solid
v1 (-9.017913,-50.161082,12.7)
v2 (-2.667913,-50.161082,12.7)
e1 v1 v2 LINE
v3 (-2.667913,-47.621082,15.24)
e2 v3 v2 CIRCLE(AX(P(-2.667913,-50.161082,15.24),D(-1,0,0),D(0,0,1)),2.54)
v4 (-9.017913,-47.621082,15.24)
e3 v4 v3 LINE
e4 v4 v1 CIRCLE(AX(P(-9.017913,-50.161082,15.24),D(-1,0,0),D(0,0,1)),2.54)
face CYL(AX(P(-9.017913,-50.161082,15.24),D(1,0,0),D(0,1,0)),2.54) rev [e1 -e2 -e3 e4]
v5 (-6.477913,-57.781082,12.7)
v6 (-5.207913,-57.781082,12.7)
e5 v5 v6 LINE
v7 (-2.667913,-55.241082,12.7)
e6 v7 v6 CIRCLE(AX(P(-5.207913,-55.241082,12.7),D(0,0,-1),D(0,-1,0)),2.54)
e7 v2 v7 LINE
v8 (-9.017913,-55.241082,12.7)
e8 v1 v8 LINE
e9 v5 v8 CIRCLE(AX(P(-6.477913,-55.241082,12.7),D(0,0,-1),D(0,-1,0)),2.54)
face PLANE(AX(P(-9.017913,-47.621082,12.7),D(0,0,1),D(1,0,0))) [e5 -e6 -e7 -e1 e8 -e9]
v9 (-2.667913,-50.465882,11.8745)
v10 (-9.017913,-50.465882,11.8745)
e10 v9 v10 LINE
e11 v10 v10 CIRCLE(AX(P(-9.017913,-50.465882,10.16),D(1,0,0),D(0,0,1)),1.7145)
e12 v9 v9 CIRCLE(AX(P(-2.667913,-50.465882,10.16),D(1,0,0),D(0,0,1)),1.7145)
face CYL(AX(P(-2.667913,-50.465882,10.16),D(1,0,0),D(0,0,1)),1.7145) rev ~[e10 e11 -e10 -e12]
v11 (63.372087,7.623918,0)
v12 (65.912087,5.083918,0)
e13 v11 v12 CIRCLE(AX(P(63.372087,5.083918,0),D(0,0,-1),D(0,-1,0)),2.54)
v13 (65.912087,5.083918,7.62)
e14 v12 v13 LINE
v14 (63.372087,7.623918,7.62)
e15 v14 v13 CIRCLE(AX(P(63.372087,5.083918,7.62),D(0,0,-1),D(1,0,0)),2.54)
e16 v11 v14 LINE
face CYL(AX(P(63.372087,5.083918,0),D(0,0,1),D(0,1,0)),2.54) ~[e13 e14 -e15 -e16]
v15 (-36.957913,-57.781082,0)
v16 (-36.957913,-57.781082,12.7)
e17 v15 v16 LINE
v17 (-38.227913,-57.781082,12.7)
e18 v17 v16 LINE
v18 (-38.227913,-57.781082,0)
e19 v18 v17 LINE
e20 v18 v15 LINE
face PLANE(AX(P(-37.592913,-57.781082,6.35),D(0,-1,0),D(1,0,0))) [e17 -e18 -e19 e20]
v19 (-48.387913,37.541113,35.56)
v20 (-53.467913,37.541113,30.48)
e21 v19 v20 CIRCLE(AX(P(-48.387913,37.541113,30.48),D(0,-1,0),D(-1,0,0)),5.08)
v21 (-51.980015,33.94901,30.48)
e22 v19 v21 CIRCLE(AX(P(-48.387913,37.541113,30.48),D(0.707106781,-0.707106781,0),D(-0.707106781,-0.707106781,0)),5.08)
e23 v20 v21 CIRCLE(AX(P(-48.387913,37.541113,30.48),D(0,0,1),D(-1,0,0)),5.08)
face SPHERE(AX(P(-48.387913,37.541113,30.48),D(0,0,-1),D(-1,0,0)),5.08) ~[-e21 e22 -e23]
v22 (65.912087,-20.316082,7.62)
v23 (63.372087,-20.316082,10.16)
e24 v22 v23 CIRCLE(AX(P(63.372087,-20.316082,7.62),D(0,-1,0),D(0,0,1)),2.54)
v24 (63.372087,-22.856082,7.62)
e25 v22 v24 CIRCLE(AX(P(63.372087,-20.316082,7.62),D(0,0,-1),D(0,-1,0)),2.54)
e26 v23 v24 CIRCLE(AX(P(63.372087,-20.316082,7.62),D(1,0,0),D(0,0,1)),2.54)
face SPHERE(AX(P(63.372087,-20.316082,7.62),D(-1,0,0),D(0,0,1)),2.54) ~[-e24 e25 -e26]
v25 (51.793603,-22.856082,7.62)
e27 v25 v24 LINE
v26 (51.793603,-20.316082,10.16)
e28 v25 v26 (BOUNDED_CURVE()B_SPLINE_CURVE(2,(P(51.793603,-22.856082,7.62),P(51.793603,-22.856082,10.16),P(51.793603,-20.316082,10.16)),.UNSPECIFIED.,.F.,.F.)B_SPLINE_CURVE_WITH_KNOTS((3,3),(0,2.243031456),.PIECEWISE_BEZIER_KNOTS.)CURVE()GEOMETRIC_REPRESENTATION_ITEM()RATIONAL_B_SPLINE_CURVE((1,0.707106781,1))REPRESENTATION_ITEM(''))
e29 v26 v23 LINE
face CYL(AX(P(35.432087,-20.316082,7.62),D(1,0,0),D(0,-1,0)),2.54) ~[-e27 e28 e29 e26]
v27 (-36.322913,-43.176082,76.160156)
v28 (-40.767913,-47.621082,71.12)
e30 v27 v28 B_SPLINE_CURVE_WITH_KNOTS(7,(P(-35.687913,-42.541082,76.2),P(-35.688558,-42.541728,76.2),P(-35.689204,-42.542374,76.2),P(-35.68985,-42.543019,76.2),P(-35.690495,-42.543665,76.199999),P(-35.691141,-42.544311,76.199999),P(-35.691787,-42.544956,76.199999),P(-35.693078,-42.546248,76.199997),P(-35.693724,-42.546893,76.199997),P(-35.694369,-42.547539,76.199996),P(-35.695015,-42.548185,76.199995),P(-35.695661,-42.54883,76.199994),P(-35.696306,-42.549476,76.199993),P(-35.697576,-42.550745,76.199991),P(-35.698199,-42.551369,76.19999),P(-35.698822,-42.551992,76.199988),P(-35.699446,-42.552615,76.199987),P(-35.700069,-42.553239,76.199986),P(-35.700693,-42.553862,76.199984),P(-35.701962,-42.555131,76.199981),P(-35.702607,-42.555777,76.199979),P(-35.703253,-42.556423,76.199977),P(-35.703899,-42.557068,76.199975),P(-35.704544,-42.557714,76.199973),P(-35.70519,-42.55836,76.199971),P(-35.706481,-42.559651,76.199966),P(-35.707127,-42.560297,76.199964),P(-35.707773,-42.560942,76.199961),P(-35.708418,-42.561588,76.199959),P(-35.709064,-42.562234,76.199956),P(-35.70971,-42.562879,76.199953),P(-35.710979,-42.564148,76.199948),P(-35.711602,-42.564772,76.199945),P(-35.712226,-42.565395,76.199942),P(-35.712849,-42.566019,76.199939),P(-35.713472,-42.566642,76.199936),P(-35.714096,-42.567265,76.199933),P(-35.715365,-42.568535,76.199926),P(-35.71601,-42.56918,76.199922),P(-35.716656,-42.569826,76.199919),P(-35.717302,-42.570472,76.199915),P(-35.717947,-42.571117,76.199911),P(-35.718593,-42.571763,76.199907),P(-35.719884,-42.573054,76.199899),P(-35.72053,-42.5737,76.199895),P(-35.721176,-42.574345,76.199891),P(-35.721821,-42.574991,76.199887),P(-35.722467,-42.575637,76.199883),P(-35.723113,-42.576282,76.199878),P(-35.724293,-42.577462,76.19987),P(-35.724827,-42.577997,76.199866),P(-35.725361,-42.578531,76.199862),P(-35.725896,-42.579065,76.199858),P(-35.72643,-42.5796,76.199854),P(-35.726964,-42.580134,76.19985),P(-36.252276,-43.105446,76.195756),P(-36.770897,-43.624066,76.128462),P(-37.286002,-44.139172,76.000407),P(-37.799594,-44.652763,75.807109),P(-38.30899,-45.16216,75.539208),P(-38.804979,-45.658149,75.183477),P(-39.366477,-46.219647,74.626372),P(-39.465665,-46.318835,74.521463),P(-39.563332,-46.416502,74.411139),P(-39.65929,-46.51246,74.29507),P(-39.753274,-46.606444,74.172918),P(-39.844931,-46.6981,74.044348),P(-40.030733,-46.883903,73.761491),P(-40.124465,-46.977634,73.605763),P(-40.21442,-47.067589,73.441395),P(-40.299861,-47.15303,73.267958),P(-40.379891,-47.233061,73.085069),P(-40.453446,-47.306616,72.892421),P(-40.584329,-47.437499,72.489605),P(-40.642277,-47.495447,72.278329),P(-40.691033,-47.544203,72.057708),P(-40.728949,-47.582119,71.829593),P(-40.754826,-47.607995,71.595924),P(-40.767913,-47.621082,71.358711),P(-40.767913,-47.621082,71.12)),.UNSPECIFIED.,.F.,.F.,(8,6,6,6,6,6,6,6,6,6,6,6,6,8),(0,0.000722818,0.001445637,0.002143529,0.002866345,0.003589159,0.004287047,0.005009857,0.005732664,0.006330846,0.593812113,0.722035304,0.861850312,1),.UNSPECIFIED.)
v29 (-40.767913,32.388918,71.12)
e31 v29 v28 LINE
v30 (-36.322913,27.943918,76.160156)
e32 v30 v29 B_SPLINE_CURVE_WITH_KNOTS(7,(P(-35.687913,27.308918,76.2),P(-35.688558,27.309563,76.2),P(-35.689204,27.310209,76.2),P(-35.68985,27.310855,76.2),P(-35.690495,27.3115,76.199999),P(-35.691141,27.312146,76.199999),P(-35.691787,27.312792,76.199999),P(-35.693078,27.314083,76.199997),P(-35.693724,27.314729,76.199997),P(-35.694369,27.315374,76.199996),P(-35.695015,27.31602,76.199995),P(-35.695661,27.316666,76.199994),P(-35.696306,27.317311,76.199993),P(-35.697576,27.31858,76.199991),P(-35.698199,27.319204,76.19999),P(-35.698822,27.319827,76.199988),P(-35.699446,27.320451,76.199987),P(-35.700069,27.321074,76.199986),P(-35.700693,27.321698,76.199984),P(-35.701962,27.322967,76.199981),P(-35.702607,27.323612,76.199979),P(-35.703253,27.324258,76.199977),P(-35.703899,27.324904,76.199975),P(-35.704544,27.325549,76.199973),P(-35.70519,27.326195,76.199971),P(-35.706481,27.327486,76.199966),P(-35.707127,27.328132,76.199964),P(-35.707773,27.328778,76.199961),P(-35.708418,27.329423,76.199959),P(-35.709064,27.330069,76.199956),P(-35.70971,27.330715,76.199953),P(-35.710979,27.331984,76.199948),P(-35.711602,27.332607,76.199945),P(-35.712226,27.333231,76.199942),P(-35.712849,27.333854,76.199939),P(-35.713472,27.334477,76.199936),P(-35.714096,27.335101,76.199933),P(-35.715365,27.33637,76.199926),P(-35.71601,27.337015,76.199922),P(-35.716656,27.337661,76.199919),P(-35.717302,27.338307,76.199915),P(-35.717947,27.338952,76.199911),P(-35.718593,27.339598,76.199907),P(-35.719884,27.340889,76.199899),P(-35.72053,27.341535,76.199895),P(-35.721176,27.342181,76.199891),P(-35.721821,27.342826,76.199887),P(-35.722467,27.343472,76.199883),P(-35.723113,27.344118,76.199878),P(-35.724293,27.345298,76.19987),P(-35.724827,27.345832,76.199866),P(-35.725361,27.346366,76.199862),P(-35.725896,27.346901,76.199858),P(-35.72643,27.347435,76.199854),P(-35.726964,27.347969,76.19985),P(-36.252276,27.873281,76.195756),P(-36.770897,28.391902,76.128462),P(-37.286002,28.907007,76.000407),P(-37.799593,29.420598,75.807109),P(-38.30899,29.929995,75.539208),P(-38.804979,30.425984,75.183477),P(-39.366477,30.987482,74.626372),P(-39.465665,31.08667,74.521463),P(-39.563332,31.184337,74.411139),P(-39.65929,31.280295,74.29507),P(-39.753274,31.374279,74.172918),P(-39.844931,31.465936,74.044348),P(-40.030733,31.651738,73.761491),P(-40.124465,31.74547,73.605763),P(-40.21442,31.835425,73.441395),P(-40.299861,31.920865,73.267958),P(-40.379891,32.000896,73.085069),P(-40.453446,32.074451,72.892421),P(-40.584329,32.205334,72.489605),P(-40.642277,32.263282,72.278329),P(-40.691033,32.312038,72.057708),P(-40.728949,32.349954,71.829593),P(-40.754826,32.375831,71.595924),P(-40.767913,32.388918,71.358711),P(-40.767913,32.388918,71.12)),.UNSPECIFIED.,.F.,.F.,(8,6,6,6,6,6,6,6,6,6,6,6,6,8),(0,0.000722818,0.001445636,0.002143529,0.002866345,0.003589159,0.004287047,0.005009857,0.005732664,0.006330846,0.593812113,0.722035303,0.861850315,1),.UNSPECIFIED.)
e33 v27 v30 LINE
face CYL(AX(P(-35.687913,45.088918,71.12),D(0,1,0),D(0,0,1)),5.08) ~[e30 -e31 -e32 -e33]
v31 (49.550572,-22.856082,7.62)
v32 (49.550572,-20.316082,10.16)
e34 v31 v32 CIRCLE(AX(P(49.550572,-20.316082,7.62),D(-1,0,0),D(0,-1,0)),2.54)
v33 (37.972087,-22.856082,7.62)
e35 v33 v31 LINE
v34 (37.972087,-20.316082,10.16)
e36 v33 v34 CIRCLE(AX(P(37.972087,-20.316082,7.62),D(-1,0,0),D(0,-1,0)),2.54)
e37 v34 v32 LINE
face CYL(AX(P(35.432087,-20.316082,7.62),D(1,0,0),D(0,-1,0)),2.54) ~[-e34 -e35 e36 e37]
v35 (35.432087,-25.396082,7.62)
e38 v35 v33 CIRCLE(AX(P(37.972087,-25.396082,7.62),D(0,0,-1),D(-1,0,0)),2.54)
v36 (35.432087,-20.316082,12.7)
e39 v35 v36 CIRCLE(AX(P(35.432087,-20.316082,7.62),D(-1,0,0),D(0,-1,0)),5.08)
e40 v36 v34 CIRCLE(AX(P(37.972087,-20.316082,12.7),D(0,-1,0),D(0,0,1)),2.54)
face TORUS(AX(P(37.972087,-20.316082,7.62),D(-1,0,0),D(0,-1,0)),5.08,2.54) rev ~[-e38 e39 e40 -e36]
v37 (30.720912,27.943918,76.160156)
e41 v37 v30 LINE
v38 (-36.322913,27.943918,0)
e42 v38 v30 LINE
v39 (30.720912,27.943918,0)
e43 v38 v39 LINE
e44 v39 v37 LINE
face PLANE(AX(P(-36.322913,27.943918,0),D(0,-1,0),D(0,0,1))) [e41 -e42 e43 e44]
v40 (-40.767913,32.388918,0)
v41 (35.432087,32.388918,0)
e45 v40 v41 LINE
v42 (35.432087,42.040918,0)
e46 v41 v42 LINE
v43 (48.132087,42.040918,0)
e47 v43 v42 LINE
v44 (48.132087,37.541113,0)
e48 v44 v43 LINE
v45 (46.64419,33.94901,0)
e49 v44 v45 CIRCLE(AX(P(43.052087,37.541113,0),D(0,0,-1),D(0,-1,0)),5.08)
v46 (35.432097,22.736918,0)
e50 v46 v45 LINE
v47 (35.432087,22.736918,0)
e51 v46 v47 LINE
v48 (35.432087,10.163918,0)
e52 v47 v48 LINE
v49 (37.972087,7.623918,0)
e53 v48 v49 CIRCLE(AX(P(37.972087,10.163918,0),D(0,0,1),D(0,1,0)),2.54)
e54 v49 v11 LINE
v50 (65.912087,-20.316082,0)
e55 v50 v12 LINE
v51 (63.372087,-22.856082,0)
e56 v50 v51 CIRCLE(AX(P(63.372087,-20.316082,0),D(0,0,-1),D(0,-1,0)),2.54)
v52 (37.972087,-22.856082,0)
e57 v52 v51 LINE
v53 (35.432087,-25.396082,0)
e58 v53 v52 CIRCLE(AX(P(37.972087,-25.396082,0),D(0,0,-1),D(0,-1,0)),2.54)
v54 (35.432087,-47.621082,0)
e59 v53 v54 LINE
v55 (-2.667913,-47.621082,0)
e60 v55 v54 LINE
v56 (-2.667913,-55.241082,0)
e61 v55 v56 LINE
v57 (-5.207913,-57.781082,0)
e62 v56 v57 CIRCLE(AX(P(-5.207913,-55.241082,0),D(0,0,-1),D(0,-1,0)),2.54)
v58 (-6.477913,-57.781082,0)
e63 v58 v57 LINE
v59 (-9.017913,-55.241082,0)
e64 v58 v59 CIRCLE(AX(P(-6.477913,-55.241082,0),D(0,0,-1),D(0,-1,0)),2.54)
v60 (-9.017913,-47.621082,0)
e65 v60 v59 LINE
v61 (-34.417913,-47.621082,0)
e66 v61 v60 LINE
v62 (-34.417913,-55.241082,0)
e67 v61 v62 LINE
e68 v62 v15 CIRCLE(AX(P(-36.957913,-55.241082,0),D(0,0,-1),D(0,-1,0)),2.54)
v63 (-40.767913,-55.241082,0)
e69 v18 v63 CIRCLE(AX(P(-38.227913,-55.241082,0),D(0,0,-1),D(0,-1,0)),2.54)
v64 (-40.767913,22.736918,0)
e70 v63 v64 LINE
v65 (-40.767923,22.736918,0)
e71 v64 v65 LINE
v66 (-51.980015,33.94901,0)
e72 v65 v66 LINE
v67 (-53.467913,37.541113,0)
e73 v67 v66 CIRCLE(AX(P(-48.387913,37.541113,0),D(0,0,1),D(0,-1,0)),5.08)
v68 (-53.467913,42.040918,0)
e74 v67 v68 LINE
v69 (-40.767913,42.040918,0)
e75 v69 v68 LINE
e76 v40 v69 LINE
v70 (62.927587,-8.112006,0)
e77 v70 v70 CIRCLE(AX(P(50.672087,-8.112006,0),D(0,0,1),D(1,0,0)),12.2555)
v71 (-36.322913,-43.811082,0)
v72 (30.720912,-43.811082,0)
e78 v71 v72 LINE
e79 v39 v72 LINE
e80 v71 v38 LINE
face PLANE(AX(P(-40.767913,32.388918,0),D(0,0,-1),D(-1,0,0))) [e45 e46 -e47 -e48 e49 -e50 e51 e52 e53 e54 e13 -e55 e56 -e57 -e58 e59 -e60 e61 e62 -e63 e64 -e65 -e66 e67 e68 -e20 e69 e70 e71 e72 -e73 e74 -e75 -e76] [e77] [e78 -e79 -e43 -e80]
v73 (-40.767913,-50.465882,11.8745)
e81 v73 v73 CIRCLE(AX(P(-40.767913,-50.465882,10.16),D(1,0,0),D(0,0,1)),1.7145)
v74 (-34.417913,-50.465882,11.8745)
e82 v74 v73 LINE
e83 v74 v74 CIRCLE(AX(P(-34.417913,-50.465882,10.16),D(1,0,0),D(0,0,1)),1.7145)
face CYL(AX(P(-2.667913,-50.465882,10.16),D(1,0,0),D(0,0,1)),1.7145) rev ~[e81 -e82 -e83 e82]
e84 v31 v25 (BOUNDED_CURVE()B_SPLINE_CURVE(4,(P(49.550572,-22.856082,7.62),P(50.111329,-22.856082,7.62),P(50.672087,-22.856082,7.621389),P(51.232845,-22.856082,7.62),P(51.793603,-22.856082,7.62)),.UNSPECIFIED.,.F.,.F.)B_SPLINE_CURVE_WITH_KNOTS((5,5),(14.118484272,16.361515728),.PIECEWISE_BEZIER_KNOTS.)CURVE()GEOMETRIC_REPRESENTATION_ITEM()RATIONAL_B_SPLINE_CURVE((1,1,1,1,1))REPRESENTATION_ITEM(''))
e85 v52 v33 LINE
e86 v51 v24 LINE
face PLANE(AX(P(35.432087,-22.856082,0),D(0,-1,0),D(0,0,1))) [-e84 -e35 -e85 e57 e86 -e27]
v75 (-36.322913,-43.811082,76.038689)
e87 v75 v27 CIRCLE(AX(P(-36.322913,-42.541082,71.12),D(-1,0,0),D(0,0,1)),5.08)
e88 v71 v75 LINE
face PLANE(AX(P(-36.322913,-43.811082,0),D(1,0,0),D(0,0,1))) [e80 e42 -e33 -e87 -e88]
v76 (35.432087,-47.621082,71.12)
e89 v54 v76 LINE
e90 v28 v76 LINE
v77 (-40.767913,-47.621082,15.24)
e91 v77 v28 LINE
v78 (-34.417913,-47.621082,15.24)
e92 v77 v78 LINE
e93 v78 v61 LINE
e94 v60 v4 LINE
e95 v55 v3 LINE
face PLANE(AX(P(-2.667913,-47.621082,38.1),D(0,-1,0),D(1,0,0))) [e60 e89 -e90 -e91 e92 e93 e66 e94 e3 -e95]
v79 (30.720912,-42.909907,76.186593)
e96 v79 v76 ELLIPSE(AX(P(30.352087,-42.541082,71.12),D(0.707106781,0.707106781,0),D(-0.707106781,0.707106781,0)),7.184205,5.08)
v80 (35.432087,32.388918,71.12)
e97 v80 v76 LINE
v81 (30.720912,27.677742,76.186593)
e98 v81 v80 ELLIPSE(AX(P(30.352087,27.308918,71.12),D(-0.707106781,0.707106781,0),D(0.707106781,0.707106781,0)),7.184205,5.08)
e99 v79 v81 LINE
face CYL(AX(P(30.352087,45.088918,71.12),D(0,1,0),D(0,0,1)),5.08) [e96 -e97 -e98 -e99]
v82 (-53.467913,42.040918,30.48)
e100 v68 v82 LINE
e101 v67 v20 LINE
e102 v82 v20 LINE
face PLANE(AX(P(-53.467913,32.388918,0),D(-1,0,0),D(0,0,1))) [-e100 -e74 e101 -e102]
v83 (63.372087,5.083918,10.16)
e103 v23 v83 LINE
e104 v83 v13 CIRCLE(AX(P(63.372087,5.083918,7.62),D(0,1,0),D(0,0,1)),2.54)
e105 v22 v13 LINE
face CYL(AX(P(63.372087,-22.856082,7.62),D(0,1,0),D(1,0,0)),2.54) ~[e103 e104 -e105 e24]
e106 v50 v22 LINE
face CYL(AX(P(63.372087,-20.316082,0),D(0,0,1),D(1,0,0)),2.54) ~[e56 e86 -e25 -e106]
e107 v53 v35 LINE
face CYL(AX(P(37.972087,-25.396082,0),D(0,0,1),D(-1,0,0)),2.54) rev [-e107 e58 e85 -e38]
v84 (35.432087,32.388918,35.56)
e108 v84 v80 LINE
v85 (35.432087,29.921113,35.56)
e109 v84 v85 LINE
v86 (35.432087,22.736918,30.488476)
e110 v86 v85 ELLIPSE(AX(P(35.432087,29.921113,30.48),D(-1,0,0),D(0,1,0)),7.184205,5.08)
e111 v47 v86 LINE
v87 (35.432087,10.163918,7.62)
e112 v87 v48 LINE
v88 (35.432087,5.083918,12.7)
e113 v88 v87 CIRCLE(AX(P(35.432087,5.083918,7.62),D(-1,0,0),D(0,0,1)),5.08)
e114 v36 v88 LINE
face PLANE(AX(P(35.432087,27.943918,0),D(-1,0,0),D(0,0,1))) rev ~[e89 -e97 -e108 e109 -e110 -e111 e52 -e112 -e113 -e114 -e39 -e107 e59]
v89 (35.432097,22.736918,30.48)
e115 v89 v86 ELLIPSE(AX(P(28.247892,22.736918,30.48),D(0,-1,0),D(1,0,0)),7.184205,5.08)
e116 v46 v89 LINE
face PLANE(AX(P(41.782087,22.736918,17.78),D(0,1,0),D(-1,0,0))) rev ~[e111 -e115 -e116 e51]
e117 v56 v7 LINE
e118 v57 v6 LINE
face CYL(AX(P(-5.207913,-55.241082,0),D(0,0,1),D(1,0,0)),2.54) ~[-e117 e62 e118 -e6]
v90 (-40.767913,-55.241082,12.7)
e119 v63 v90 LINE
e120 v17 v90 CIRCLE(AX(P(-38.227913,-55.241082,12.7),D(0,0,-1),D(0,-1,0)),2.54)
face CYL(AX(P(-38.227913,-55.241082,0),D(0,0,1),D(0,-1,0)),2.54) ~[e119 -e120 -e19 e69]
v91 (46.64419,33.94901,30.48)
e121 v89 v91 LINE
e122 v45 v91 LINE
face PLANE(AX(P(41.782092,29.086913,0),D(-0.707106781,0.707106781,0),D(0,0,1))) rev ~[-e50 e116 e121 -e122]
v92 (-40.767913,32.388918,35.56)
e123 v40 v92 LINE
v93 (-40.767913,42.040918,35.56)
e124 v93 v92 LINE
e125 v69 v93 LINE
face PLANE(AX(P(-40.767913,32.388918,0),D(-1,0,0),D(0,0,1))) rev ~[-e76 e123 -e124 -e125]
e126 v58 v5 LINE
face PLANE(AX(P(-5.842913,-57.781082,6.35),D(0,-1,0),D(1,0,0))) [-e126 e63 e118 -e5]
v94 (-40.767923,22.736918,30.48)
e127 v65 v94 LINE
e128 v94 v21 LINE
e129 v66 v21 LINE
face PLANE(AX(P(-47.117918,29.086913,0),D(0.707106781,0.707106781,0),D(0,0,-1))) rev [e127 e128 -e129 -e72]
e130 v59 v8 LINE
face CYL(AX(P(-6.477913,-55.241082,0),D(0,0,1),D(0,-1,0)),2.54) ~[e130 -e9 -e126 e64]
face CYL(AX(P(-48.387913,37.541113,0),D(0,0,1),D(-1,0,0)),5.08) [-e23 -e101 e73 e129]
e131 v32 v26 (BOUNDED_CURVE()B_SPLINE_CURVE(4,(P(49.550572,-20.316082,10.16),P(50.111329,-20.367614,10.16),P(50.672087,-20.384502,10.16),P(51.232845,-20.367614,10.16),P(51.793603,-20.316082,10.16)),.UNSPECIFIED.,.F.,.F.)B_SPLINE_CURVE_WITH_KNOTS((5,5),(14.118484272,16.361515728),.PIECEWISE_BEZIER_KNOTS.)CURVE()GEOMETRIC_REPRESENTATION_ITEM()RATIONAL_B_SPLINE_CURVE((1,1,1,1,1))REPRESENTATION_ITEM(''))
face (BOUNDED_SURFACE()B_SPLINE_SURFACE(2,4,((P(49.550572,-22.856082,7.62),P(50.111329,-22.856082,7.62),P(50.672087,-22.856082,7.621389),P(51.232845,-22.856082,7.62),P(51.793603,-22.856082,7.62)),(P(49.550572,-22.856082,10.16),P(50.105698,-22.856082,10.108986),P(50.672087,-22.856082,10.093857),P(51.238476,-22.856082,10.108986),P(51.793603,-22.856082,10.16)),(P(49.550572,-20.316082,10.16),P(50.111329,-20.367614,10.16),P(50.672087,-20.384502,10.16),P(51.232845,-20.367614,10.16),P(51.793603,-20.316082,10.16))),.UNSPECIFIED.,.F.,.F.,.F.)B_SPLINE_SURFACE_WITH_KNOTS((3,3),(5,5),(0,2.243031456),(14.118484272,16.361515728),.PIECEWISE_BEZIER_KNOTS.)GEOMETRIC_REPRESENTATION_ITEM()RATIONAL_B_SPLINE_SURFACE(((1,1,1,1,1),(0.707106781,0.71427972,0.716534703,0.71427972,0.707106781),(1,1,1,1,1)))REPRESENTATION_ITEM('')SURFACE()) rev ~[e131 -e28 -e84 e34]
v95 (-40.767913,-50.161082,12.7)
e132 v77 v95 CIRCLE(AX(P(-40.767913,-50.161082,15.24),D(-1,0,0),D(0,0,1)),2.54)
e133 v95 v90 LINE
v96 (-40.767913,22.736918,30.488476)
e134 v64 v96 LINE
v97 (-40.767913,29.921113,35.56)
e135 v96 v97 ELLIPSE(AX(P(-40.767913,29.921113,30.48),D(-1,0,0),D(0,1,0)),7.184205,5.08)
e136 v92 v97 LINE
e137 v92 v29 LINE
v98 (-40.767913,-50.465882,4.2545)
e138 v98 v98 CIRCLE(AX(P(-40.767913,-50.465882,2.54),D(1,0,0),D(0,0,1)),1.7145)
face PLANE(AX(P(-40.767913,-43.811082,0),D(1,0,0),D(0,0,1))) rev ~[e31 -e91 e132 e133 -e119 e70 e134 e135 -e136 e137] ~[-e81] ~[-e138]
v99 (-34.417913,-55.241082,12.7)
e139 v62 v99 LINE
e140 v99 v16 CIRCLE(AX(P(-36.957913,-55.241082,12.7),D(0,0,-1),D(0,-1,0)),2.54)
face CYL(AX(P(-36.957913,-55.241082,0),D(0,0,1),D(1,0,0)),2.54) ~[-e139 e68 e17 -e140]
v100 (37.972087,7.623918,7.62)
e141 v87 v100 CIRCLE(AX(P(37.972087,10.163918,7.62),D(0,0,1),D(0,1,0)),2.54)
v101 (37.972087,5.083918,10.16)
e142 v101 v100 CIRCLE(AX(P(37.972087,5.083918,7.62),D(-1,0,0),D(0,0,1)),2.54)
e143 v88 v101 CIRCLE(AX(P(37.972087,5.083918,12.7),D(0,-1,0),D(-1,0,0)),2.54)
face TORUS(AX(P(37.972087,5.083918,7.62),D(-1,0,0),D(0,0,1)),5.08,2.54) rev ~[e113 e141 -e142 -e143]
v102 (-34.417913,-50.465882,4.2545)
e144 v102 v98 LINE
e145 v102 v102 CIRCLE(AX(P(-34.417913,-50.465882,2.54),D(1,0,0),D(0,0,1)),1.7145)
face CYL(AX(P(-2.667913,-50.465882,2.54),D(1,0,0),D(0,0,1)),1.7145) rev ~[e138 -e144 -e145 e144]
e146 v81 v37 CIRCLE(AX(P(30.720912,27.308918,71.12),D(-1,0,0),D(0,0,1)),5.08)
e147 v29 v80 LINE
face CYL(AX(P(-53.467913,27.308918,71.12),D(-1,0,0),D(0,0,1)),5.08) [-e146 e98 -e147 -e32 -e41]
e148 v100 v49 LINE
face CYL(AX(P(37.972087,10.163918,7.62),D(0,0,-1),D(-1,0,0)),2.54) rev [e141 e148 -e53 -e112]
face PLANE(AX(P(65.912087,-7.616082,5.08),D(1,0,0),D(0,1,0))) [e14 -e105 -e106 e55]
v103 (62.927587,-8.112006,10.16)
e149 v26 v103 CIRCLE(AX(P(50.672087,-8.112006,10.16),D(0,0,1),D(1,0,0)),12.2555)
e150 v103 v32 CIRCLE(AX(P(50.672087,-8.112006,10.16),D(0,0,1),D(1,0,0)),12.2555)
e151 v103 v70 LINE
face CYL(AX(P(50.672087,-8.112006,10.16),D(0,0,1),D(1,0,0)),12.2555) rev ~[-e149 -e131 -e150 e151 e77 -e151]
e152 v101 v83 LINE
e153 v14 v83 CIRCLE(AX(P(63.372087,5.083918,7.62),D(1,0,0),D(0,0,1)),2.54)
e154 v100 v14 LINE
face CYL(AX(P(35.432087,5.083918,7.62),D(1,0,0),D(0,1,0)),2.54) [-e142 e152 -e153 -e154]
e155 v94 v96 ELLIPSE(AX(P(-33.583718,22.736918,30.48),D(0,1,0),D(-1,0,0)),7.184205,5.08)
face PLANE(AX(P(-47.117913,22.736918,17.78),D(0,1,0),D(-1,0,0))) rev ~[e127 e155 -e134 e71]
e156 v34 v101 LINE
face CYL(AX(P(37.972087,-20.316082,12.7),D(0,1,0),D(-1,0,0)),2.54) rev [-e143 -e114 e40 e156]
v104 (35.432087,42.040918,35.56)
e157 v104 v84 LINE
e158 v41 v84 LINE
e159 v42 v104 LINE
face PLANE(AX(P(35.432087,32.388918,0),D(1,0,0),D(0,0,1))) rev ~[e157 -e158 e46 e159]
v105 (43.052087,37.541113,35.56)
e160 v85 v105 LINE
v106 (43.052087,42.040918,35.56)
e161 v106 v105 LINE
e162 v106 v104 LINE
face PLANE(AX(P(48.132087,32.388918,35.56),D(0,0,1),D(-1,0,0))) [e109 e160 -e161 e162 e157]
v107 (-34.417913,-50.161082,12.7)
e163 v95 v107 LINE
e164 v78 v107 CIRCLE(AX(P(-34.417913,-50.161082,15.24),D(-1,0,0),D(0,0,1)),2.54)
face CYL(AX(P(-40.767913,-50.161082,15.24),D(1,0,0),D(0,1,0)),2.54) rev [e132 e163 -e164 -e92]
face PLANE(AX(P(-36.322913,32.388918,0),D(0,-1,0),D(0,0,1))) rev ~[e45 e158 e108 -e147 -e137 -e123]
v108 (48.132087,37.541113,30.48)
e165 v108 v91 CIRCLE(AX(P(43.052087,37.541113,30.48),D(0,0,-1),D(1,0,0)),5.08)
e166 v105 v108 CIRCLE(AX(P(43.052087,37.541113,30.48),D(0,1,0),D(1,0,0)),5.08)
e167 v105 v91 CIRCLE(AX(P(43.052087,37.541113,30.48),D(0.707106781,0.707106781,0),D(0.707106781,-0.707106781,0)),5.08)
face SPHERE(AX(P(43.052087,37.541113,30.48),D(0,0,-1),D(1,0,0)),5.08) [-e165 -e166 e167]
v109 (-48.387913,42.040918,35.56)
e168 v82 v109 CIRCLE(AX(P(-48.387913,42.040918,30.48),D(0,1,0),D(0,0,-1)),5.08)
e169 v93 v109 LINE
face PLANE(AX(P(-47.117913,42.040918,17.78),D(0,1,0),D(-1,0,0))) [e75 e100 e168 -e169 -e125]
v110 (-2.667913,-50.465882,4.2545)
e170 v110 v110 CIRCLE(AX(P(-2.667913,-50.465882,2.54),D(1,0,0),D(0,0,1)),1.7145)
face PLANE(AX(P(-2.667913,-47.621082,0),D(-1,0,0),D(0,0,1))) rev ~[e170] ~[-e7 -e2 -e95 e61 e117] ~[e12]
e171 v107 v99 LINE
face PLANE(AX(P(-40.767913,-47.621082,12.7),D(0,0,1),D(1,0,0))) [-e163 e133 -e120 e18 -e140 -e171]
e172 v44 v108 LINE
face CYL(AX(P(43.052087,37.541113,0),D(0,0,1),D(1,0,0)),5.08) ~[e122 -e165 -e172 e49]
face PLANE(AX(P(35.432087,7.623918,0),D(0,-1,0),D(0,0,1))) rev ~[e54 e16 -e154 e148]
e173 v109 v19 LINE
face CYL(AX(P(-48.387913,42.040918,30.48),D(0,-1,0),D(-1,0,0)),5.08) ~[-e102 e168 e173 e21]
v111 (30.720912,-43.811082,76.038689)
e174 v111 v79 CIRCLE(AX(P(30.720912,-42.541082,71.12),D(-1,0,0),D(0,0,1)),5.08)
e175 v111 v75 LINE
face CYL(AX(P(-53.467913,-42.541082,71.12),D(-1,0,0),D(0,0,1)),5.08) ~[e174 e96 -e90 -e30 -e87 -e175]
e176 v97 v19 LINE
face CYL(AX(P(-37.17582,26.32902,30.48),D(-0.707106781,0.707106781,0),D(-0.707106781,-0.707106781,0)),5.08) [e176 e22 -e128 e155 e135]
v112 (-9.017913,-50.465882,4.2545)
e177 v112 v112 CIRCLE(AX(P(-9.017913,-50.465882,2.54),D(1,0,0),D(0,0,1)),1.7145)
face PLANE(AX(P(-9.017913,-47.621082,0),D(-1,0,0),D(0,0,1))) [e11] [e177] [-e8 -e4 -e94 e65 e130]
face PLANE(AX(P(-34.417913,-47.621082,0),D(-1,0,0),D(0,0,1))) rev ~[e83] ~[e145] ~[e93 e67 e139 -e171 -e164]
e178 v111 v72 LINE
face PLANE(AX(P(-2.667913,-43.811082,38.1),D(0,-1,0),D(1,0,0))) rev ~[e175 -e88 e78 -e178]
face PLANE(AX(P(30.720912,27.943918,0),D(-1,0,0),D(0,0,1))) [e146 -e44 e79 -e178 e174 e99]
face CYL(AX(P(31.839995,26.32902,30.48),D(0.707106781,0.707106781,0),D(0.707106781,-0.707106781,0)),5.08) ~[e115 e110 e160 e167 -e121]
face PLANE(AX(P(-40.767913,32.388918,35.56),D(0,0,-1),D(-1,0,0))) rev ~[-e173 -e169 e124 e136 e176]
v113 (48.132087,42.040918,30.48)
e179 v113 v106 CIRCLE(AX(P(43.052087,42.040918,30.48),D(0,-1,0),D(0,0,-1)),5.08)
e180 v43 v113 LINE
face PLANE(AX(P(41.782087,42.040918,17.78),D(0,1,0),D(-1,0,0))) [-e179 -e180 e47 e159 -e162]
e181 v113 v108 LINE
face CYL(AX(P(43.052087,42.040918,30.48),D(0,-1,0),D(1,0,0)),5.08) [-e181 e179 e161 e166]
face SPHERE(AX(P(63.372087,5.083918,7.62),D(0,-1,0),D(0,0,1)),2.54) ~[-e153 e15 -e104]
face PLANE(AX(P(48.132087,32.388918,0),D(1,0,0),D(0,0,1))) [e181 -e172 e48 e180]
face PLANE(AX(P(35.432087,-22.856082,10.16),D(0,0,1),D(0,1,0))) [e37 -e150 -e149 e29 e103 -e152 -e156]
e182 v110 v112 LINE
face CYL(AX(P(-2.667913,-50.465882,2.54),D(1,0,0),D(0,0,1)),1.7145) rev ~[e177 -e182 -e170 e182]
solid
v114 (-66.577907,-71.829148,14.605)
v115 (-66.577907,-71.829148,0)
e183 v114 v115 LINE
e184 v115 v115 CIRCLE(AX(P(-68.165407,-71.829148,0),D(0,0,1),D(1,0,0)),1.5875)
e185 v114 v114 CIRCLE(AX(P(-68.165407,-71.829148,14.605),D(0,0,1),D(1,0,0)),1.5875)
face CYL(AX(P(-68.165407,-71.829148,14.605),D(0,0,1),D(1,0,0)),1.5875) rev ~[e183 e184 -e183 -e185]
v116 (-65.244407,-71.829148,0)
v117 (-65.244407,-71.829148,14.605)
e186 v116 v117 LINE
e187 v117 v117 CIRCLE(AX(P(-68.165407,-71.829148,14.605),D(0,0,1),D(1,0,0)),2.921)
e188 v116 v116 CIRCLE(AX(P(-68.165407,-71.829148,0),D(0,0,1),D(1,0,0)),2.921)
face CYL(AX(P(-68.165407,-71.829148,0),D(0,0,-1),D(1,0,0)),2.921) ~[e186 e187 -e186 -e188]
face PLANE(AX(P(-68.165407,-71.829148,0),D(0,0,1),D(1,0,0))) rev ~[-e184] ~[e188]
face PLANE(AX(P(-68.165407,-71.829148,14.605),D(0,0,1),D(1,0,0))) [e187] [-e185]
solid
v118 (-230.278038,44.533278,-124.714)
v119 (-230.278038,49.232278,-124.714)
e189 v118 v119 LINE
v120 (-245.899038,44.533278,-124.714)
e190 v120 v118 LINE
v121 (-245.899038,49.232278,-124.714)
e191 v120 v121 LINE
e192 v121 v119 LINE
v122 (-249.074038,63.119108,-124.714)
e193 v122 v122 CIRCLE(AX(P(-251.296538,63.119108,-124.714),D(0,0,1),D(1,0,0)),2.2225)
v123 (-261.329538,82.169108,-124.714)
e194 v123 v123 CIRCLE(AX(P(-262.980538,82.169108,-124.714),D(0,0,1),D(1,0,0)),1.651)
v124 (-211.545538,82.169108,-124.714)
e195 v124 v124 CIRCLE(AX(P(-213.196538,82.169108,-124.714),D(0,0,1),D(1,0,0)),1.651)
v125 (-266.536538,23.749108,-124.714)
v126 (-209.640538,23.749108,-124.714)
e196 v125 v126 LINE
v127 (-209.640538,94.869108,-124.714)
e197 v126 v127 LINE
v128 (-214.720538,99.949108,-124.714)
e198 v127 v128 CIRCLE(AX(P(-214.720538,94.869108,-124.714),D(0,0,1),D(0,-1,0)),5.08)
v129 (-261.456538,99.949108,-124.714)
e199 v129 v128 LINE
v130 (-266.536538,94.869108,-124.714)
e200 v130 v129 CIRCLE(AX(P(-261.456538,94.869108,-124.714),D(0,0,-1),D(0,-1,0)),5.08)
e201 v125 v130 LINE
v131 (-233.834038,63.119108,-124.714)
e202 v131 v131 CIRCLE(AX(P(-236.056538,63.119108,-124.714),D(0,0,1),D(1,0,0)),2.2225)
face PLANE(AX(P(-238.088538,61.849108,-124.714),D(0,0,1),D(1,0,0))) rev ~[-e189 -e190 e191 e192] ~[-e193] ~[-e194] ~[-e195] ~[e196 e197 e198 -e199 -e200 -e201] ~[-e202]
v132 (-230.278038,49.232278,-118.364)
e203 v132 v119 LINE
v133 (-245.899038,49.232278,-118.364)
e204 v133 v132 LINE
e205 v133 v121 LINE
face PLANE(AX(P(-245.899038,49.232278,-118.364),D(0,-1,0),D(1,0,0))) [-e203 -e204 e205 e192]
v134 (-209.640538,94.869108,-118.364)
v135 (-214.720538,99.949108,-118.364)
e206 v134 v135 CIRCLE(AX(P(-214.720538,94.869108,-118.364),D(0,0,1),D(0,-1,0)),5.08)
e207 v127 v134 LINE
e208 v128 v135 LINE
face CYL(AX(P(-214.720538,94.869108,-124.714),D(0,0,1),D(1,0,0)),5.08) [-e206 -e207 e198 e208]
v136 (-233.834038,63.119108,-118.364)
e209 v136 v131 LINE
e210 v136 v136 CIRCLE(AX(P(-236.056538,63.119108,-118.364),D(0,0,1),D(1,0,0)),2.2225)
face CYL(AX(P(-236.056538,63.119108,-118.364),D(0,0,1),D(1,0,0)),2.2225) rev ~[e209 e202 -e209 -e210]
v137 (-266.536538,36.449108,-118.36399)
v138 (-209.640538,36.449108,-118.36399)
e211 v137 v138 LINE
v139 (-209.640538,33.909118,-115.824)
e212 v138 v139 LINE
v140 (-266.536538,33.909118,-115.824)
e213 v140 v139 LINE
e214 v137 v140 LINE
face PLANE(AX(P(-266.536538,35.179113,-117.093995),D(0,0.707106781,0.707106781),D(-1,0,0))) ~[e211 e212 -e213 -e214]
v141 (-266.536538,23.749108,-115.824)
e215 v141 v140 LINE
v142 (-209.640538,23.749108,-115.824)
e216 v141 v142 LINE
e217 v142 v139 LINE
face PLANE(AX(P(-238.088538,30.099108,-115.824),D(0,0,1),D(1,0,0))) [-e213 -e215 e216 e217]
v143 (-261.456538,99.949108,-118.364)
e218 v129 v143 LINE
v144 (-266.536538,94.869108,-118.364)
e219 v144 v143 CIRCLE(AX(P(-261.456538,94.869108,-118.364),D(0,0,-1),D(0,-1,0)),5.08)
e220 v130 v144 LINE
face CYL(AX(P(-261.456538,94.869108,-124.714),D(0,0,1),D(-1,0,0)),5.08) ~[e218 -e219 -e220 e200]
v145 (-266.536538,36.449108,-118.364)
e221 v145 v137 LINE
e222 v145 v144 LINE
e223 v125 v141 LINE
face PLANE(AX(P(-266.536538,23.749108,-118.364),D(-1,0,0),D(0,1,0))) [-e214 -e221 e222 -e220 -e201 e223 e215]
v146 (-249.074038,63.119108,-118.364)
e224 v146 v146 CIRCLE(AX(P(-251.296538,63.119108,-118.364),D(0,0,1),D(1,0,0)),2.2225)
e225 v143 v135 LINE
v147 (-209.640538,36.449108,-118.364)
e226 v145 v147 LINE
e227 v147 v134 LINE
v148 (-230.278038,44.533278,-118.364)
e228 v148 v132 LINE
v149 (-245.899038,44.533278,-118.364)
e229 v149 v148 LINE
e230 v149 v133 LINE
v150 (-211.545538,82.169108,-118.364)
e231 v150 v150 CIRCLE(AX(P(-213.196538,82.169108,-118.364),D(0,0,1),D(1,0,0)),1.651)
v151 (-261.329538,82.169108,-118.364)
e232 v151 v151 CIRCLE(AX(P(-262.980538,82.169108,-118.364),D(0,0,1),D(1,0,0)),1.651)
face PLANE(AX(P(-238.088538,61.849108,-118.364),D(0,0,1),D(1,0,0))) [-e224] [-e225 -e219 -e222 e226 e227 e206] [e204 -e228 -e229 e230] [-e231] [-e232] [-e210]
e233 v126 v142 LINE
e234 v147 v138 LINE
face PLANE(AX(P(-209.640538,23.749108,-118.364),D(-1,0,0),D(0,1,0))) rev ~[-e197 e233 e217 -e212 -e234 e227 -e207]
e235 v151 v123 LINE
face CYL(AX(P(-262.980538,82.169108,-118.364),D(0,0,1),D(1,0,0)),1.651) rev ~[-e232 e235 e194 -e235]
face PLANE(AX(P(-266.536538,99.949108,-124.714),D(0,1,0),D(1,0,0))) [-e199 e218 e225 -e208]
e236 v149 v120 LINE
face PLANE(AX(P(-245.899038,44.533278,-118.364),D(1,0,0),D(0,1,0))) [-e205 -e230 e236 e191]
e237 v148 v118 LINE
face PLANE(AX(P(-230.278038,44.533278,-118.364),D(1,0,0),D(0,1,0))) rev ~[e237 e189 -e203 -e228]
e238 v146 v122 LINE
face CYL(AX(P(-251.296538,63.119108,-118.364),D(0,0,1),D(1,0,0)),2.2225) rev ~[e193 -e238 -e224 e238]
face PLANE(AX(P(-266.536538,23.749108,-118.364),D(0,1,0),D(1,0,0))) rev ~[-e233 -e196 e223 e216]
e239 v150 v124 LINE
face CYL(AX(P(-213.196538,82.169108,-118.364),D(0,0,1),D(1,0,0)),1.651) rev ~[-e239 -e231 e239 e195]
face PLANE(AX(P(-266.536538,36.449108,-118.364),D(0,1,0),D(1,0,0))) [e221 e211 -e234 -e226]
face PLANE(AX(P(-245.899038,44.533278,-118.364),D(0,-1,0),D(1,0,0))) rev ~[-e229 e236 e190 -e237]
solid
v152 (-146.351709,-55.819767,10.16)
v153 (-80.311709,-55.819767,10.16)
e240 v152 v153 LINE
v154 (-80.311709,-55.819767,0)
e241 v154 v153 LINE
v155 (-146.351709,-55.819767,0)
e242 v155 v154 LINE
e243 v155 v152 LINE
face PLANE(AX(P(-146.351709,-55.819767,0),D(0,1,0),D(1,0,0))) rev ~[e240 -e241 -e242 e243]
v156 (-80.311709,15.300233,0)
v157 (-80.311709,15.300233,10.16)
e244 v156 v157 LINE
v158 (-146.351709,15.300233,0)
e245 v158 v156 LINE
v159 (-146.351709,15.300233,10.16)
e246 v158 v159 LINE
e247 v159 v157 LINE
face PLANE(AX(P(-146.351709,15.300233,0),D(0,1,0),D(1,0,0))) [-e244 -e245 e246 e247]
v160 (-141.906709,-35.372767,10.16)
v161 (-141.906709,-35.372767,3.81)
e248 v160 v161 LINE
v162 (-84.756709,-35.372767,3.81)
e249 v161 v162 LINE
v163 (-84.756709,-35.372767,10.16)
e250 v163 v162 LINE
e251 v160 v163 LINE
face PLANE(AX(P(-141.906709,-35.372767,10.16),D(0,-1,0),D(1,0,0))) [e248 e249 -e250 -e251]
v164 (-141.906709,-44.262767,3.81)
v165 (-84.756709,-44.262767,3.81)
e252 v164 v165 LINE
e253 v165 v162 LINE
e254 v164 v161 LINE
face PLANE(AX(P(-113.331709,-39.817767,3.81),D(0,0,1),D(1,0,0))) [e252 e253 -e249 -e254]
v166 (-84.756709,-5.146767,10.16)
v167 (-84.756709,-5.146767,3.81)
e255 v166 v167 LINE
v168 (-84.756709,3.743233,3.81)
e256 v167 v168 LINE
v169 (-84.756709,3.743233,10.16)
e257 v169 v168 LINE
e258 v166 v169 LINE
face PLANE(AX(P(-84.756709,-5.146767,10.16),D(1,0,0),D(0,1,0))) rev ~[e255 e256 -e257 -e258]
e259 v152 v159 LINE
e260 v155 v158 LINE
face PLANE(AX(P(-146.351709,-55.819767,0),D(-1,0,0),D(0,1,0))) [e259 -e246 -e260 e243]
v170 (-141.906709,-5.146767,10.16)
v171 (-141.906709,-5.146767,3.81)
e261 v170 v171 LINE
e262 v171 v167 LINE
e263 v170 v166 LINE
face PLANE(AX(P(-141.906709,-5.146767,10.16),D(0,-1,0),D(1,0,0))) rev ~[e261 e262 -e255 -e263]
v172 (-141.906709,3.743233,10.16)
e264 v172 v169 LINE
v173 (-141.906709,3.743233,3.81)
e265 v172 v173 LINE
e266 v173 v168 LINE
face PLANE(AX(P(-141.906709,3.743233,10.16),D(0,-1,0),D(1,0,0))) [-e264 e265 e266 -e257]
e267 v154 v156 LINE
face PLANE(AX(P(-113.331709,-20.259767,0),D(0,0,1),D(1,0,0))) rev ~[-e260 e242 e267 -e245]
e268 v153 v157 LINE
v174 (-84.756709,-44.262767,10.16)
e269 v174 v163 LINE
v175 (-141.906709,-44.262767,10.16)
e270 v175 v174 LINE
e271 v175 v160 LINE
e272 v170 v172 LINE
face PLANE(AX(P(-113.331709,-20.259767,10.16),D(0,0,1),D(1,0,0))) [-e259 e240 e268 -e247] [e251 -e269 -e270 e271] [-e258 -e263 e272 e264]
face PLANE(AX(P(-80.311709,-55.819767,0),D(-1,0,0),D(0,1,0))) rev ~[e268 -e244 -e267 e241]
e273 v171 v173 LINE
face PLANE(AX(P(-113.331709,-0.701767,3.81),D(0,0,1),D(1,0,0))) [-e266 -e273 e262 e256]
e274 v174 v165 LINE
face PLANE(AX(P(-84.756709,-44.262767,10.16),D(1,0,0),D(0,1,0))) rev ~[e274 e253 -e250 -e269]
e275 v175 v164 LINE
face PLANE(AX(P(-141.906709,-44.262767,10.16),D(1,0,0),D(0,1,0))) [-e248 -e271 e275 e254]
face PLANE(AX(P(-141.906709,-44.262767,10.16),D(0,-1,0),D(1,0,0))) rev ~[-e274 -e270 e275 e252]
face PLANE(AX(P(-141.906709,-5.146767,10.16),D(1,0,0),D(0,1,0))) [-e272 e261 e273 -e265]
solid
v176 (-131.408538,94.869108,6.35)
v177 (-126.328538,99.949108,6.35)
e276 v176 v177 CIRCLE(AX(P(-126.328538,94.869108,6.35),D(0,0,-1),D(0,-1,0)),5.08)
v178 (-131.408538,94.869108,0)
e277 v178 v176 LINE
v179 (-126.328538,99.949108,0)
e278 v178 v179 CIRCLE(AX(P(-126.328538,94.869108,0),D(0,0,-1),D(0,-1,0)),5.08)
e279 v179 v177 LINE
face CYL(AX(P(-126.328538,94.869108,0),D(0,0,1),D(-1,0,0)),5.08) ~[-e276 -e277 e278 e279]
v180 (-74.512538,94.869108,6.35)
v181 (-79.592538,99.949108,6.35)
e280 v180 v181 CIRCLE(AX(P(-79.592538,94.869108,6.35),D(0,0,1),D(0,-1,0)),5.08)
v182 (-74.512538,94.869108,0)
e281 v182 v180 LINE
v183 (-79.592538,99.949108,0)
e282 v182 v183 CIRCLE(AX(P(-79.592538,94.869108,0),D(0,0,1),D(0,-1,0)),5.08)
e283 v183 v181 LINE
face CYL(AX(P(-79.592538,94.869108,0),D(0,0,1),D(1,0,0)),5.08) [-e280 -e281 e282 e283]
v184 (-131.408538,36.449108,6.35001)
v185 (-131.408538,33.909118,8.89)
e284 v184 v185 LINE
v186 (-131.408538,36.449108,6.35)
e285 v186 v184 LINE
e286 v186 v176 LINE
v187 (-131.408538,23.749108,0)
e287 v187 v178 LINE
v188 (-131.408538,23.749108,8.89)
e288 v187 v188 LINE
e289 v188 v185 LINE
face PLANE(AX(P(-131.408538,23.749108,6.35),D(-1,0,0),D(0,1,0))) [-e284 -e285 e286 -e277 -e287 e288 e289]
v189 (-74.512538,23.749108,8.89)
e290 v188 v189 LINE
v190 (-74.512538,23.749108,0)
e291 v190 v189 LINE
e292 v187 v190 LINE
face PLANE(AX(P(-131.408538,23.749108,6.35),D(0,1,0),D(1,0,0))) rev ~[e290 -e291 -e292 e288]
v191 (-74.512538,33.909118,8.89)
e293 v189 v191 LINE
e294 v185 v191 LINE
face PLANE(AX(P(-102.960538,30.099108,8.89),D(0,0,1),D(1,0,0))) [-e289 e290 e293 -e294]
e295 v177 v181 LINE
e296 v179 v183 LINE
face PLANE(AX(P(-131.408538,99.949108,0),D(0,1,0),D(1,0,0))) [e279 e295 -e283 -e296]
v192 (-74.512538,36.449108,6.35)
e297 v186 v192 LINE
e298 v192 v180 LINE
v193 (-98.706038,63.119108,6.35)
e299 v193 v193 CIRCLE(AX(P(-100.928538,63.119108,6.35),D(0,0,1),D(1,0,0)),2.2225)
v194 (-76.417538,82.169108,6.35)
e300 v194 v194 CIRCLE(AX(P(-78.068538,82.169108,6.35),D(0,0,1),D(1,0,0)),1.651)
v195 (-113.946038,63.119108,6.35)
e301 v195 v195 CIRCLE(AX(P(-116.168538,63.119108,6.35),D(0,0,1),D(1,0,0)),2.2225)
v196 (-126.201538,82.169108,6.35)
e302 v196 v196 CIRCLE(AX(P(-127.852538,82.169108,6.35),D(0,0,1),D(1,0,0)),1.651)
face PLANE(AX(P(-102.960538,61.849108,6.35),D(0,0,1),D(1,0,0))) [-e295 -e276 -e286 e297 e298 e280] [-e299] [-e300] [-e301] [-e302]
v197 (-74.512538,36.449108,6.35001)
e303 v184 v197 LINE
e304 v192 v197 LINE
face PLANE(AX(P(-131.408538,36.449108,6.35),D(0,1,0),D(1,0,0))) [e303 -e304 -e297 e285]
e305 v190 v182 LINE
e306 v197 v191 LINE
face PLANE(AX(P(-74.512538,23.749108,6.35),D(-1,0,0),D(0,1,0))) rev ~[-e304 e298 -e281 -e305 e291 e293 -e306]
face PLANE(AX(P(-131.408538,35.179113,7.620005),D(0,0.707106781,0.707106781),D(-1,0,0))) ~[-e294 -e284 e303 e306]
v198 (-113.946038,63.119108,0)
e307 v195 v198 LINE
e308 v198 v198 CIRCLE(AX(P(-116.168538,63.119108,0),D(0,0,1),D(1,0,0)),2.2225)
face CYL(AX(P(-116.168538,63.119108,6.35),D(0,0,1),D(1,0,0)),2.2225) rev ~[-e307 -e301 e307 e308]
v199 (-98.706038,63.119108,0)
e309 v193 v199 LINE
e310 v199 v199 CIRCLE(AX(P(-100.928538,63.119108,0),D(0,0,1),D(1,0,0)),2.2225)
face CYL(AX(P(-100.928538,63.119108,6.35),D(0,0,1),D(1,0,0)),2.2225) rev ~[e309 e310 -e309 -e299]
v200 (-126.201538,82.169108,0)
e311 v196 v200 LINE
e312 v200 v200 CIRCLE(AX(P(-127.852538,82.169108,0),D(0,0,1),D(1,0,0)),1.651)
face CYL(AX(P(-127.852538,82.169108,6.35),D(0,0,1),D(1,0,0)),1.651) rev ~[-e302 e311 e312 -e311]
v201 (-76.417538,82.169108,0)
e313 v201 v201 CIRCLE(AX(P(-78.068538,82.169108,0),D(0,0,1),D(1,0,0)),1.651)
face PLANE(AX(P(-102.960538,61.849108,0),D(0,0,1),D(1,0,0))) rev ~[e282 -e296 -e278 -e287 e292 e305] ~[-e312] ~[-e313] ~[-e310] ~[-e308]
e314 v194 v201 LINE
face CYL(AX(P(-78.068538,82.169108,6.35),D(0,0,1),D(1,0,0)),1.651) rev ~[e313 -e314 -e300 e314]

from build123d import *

# Parameters (mm, degrees)
F0_W         = 76.2
F0_H         = 76.2
F1_DEPTH     = 3.81
F2_W         = 6.35
F2_H         = 12.7
F3_DEPTH     = 10.16
F4_R         = 1.7145
F5_DEPTH     = 50.8
F6_ANGLE     = 90
F7_W         = 4.445
F7_H         = 76.2
F8_DEPTH     = 76.2
F9_W         = 4.445
F9_H         = 76.2
F10_DEPTH    = 71.755
F11_W        = 4.7111754219
F11_H        = 76.2
F12_DEPTH    = 73.533
F14_T1_DEPTH = 105.41
F14_T3_DEPTH = 101.6
F15_W        = 12.7
F15_H        = 35.56
F16_DEPTH    = 9.652
F17_SIZE     = 12.69999
F18_R        = 5.08
F19_W        = 30.48
F19_H        = 10.16
F20_DEPTH    = 30.48
F21_R        = 12.2555
F22_DEPTH    = 25.4
F23_F1_R     = 2.54
F23_F2_R     = 2.54
F24_R        = 2.54
F25_W        = 66.04
F25_H        = 71.12
F26_DEPTH    = 10.16
F27_W        = 57.15
F27_H        = 8.89
F28_DEPTH    = 6.35
F29_R        = 2.921
F30_DEPTH    = 14.605
F31_R        = 1.5875
F32_DEPTH    = 25.4
F33_W        = 56.896
F33_H        = 76.2
F34_DEPTH    = 6.35
F35_R        = 5.08
F36_W        = 56.896
F36_H        = 12.7
F37_DEPTH    = 2.54
F38_SIZE     = 2.53999
F39_R        = 1.651
F39_R_2      = 2.2225
F40_DEPTH    = 25.4
F42_W        = 15.621
F42_H        = 4.699
F43_DEPTH    = 25.4


# Not quite as in the source:
# - a fillet or chamfer that OpenCascade refuses, or shapes differently, is made with other operations: its cross-section is extruded or revolved along the edge and cut away or added
# - a fillet or chamfer is up to 0.001 mm smaller than in the source, because OpenCascade refuses the exact size


with BuildPart() as f1:
    # F0 (on Top) → F1 (new body)
    with BuildSketch(Plane.XY):
        with Locations((-2.667912658, -5.7110823691)):
            Rectangle(F0_W, F0_H)
    extrude(amount=F1_DEPTH)

    # F2 (on face) → F3 (join)
    with BuildSketch(Plane.XY.offset(3.81)):
        with Locations((-37.592912658, -37.4610823691)):
            Rectangle(F2_W, F2_H)
        with Locations((-5.842912658, -37.4610823691)):
            Rectangle(F2_W, F2_H)
    extrude(amount=F3_DEPTH)

    # F4 (on face) → F5 (cut)
    with BuildSketch(Plane.YZ.offset(-2.667912658)):
        with Locations((-41.2710823691, 6.6548)):
            Circle(F4_R)
        with Locations((-33.6510823691, 6.6548)):
            Circle(F4_R)
    extrude(amount=-F5_DEPTH, mode=Mode.SUBTRACT)


with BuildPart() as f1_1:
    # F6: moved
    add(f1.part.rotate(Axis((-2.667912658, -43.8110823691, 0), (1, 0, 0)), F6_ANGLE))

    # F7 (on face) → F8 (join)
    with BuildSketch(Plane(origin=(0, -43.8110823691, 0), x_dir=(-1, 0, 0), z_dir=(0, 1, 0))):
        with Locations((38.545412658, 38.1)):
            Rectangle(F7_W, F7_H)
    extrude(amount=F8_DEPTH)

    # F9 (on face) → F10 (join)
    with BuildSketch(Plane.YZ.offset(-36.322912658)):
        with Locations((30.1664176309, 38.1)):
            Rectangle(F9_W, F9_H)
    extrude(amount=F10_DEPTH)

    # F11 (on face) → F12 (join)
    with BuildSketch(Plane.XZ.offset(-27.9439176309)):
        with Locations((33.076499631, 38.1)):
            Rectangle(F11_W, F11_H)
    extrude(amount=F12_DEPTH)

    # F14: fillet of radius 5.08 on 4 edges, made by hand

    # F14_s2 → F14_t1 (cut)
    with BuildSketch(Plane.XZ.offset(-45.0889176309)):
        with BuildLine():
            ThreePointArc((-35.687912658, 76.2), (-39.2800151065, 74.7121024484), (-40.767912658, 71.12))
            Line((-40.767912658, 71.12), (-40.767912658, 76.2))
            Line((-40.767912658, 76.2), (-35.687912658, 76.2))
        make_face()
        with BuildLine():
            ThreePointArc((30.352087342, 76.2), (33.9441897904, 74.7121024484), (35.432087342, 71.12))
            Line((35.432087342, 71.12), (35.432087342, 76.2))
            Line((35.432087342, 76.2), (30.352087342, 76.2))
        make_face()
    extrude(amount=F14_T1_DEPTH, mode=Mode.SUBTRACT)

    # F14_s4 → F14_t3 (cut)
    with BuildSketch(Plane.YZ.offset(-53.467912658)):
        with BuildLine():
            ThreePointArc((-42.5410823691, 76.2), (-46.1331848175, 74.7121024484), (-47.6210823691, 71.12))
            Line((-47.6210823691, 71.12), (-47.6210823691, 76.2))
            Line((-47.6210823691, 76.2), (-42.5410823691, 76.2))
        make_face()
        with BuildLine():
            ThreePointArc((27.3089176309, 76.2), (30.9010200793, 74.7121024484), (32.3889176309, 71.12))
            Line((32.3889176309, 71.12), (32.3889176309, 76.2))
            Line((32.3889176309, 76.2), (27.3089176309, 76.2))
        make_face()
    extrude(amount=F14_T3_DEPTH, mode=Mode.SUBTRACT)

    # F15 (on face) → F16 (join, symmetric)
    with BuildSketch(Plane(origin=(0, 32.3889176309, 0), x_dir=(-1, 0, 0), z_dir=(0, 1, 0))):
        with Locations((-41.782087342, 17.78)):
            Rectangle(F15_W, F15_H)
        with Locations((47.117912658, 17.78)):
            Rectangle(F15_W, F15_H)
    extrude(amount=F16_DEPTH, both=True)

    # F17 (size 12.7 in the source; OpenCascade refuses exactly that, so slightly less here)
    f17_edges = [f1_1.edges().sort_by_distance(p)[0] for p in [
        (48.132087, 22.736918, 17.78),
        (-53.467913, 22.736918, 17.78),
    ]]
    chamfer(f17_edges, length=F17_SIZE)

    # F18
    f18_edges = [f1_1.edges().sort_by_distance(p)[0] for p in [
        (-53.467913, 38.738913, 35.56),
        (48.132087, 38.738913, 35.56),
        (-47.117918, 29.086913, 35.56),
        (-53.467913, 35.436908, 17.78),
        (41.782092, 29.086913, 35.56),
        (48.132087, 35.436908, 17.78),
    ]]
    fillet(f18_edges, radius=F18_R)

    # F19 (on face) → F20 (join)
    with BuildSketch(Plane.YZ.offset(35.432087342)):
        with Locations((-7.6160823691, 5.08)):
            Rectangle(F19_W, F19_H)
    extrude(amount=F20_DEPTH)

    # F21 (on face) → F22 (cut)
    with BuildSketch(Plane.XY.offset(10.16)):
        with Locations((50.672087342, -8.1120058894)):
            Circle(F21_R)
    extrude(amount=-F22_DEPTH, mode=Mode.SUBTRACT)

    # F23: fillet of radius 2.54 on 6 edges, made by hand

    # F23_f1
    f23_f1_edges = [f1_1.edges().sort_by_distance(p)[0] for p in [
        (50.672087342, -22.8560823691, 10.16),
        (65.912087342, -7.6160823691, 10.16),
        (50.672087342, 7.6239176309, 10.16),
        (65.912087342, -22.8560823691, 5.08),
        (65.912087342, 7.6239176309, 5.08),
    ]]
    fillet(f23_f1_edges, radius=F23_F1_R)

    # F23_f2
    f23_f2_edges = [f1_1.edges().sort_by_distance(p)[0] for p in [
        (35.432087342, -22.8560823691, 3.81),
        (35.432087342, -22.1121335933, 9.4160512242),
    ]]
    fillet(f23_f2_edges, radius=F23_F2_R)

    # F24
    f24_edges = [f1_1.edges().sort_by_distance(p)[0] for p in [
        (-5.842913, -47.621082, 12.7),
        (-37.592913, -47.621082, 12.7),
        (-34.417913, -57.781082, 6.35),
        (-40.767913, -57.781082, 6.35),
        (-9.017913, -57.781082, 6.35),
        (-2.667913, -57.781082, 6.35),
    ]]
    fillet(f24_edges, radius=F24_R)


with BuildPart() as f26:
    # F25 (on Top) → F26 (new body)
    with BuildSketch(Plane.XY):
        with Locations((-113.3317090571, -20.2597667474)):
            Rectangle(F25_W, F25_H)
    extrude(amount=F26_DEPTH)

    # F27 (on face) → F28 (cut)
    with BuildSketch(Plane.XY.offset(10.16)):
        with Locations((-113.3317090571, -0.7017667474)):
            Rectangle(F27_W, F27_H)
        with Locations((-113.3317090571, -39.8177667474)):
            Rectangle(F27_W, F27_H)
    extrude(amount=-F28_DEPTH, mode=Mode.SUBTRACT)


with BuildPart() as f30:
    # F29 (on Top) → F30 (new body)
    with BuildSketch(Plane.XY):
        with Locations((-68.1654065847, -71.8291476369)):
            Circle(F29_R)
    extrude(amount=F30_DEPTH)

    # F31 (on face) → F32 (cut)
    with BuildSketch(Plane.XY.offset(14.605)):
        with Locations((-68.1654065847, -71.8291476369)):
            Circle(F31_R)
    extrude(amount=-F32_DEPTH, mode=Mode.SUBTRACT)


with BuildPart() as f34:
    # F33 (on Top) → F34 (new body)
    with BuildSketch(Plane.XY):
        with Locations((-102.9605381191, 61.8491081373)):
            Rectangle(F33_W, F33_H)
    extrude(amount=F34_DEPTH)

    # F35
    f35_edges = [f34.edges().sort_by_distance(p)[0] for p in [
        (-131.408538, 99.949108, 3.175),
        (-74.512538, 99.949108, 3.175),
    ]]
    fillet(f35_edges, radius=F35_R)

    # F36 (on face) → F37 (join)
    with BuildSketch(Plane.XY.offset(6.35)):
        with Locations((-102.9605381191, 30.0991081373)):
            Rectangle(F36_W, F36_H)
    extrude(amount=F37_DEPTH)

    # F38 (size 2.54 in the source; OpenCascade refuses exactly that, so slightly less here)
    f38_edges = [f34.edges().sort_by_distance(p)[0] for p in [
        (-102.960538, 36.449108, 8.89),
    ]]
    chamfer(f38_edges, length=F38_SIZE)

    # F39 (on face) → F40 (cut)
    with BuildSketch(Plane.XY.offset(6.35)):
        with Locations((-78.0685381191, 82.1691081373)):
            Circle(F39_R)
        with Locations((-127.8525381191, 82.1691081373)):
            Circle(F39_R)
        with Locations((-100.9285381191, 63.1191081373)):
            Circle(F39_R_2)
        with Locations((-116.1685381191, 63.1191081373)):
            Circle(F39_R_2)
    extrude(amount=-F40_DEPTH, mode=Mode.SUBTRACT)


with BuildPart() as f41_1:
    # F41: copy of F34
    add(f34.part.moved(Location((-135.128, 0, -124.714))))

    # F42 (on face) → F43 (cut)
    with BuildSketch(Plane.XY.offset(-118.364)):
        with Locations((-238.0885381191, 46.8827777416)):
            Rectangle(F42_W, F42_H)
    extrude(amount=-F43_DEPTH, mode=Mode.SUBTRACT)


solid = Compound([f1_1.part, f26.part, f30.part, f34.part, f41_1.part])
